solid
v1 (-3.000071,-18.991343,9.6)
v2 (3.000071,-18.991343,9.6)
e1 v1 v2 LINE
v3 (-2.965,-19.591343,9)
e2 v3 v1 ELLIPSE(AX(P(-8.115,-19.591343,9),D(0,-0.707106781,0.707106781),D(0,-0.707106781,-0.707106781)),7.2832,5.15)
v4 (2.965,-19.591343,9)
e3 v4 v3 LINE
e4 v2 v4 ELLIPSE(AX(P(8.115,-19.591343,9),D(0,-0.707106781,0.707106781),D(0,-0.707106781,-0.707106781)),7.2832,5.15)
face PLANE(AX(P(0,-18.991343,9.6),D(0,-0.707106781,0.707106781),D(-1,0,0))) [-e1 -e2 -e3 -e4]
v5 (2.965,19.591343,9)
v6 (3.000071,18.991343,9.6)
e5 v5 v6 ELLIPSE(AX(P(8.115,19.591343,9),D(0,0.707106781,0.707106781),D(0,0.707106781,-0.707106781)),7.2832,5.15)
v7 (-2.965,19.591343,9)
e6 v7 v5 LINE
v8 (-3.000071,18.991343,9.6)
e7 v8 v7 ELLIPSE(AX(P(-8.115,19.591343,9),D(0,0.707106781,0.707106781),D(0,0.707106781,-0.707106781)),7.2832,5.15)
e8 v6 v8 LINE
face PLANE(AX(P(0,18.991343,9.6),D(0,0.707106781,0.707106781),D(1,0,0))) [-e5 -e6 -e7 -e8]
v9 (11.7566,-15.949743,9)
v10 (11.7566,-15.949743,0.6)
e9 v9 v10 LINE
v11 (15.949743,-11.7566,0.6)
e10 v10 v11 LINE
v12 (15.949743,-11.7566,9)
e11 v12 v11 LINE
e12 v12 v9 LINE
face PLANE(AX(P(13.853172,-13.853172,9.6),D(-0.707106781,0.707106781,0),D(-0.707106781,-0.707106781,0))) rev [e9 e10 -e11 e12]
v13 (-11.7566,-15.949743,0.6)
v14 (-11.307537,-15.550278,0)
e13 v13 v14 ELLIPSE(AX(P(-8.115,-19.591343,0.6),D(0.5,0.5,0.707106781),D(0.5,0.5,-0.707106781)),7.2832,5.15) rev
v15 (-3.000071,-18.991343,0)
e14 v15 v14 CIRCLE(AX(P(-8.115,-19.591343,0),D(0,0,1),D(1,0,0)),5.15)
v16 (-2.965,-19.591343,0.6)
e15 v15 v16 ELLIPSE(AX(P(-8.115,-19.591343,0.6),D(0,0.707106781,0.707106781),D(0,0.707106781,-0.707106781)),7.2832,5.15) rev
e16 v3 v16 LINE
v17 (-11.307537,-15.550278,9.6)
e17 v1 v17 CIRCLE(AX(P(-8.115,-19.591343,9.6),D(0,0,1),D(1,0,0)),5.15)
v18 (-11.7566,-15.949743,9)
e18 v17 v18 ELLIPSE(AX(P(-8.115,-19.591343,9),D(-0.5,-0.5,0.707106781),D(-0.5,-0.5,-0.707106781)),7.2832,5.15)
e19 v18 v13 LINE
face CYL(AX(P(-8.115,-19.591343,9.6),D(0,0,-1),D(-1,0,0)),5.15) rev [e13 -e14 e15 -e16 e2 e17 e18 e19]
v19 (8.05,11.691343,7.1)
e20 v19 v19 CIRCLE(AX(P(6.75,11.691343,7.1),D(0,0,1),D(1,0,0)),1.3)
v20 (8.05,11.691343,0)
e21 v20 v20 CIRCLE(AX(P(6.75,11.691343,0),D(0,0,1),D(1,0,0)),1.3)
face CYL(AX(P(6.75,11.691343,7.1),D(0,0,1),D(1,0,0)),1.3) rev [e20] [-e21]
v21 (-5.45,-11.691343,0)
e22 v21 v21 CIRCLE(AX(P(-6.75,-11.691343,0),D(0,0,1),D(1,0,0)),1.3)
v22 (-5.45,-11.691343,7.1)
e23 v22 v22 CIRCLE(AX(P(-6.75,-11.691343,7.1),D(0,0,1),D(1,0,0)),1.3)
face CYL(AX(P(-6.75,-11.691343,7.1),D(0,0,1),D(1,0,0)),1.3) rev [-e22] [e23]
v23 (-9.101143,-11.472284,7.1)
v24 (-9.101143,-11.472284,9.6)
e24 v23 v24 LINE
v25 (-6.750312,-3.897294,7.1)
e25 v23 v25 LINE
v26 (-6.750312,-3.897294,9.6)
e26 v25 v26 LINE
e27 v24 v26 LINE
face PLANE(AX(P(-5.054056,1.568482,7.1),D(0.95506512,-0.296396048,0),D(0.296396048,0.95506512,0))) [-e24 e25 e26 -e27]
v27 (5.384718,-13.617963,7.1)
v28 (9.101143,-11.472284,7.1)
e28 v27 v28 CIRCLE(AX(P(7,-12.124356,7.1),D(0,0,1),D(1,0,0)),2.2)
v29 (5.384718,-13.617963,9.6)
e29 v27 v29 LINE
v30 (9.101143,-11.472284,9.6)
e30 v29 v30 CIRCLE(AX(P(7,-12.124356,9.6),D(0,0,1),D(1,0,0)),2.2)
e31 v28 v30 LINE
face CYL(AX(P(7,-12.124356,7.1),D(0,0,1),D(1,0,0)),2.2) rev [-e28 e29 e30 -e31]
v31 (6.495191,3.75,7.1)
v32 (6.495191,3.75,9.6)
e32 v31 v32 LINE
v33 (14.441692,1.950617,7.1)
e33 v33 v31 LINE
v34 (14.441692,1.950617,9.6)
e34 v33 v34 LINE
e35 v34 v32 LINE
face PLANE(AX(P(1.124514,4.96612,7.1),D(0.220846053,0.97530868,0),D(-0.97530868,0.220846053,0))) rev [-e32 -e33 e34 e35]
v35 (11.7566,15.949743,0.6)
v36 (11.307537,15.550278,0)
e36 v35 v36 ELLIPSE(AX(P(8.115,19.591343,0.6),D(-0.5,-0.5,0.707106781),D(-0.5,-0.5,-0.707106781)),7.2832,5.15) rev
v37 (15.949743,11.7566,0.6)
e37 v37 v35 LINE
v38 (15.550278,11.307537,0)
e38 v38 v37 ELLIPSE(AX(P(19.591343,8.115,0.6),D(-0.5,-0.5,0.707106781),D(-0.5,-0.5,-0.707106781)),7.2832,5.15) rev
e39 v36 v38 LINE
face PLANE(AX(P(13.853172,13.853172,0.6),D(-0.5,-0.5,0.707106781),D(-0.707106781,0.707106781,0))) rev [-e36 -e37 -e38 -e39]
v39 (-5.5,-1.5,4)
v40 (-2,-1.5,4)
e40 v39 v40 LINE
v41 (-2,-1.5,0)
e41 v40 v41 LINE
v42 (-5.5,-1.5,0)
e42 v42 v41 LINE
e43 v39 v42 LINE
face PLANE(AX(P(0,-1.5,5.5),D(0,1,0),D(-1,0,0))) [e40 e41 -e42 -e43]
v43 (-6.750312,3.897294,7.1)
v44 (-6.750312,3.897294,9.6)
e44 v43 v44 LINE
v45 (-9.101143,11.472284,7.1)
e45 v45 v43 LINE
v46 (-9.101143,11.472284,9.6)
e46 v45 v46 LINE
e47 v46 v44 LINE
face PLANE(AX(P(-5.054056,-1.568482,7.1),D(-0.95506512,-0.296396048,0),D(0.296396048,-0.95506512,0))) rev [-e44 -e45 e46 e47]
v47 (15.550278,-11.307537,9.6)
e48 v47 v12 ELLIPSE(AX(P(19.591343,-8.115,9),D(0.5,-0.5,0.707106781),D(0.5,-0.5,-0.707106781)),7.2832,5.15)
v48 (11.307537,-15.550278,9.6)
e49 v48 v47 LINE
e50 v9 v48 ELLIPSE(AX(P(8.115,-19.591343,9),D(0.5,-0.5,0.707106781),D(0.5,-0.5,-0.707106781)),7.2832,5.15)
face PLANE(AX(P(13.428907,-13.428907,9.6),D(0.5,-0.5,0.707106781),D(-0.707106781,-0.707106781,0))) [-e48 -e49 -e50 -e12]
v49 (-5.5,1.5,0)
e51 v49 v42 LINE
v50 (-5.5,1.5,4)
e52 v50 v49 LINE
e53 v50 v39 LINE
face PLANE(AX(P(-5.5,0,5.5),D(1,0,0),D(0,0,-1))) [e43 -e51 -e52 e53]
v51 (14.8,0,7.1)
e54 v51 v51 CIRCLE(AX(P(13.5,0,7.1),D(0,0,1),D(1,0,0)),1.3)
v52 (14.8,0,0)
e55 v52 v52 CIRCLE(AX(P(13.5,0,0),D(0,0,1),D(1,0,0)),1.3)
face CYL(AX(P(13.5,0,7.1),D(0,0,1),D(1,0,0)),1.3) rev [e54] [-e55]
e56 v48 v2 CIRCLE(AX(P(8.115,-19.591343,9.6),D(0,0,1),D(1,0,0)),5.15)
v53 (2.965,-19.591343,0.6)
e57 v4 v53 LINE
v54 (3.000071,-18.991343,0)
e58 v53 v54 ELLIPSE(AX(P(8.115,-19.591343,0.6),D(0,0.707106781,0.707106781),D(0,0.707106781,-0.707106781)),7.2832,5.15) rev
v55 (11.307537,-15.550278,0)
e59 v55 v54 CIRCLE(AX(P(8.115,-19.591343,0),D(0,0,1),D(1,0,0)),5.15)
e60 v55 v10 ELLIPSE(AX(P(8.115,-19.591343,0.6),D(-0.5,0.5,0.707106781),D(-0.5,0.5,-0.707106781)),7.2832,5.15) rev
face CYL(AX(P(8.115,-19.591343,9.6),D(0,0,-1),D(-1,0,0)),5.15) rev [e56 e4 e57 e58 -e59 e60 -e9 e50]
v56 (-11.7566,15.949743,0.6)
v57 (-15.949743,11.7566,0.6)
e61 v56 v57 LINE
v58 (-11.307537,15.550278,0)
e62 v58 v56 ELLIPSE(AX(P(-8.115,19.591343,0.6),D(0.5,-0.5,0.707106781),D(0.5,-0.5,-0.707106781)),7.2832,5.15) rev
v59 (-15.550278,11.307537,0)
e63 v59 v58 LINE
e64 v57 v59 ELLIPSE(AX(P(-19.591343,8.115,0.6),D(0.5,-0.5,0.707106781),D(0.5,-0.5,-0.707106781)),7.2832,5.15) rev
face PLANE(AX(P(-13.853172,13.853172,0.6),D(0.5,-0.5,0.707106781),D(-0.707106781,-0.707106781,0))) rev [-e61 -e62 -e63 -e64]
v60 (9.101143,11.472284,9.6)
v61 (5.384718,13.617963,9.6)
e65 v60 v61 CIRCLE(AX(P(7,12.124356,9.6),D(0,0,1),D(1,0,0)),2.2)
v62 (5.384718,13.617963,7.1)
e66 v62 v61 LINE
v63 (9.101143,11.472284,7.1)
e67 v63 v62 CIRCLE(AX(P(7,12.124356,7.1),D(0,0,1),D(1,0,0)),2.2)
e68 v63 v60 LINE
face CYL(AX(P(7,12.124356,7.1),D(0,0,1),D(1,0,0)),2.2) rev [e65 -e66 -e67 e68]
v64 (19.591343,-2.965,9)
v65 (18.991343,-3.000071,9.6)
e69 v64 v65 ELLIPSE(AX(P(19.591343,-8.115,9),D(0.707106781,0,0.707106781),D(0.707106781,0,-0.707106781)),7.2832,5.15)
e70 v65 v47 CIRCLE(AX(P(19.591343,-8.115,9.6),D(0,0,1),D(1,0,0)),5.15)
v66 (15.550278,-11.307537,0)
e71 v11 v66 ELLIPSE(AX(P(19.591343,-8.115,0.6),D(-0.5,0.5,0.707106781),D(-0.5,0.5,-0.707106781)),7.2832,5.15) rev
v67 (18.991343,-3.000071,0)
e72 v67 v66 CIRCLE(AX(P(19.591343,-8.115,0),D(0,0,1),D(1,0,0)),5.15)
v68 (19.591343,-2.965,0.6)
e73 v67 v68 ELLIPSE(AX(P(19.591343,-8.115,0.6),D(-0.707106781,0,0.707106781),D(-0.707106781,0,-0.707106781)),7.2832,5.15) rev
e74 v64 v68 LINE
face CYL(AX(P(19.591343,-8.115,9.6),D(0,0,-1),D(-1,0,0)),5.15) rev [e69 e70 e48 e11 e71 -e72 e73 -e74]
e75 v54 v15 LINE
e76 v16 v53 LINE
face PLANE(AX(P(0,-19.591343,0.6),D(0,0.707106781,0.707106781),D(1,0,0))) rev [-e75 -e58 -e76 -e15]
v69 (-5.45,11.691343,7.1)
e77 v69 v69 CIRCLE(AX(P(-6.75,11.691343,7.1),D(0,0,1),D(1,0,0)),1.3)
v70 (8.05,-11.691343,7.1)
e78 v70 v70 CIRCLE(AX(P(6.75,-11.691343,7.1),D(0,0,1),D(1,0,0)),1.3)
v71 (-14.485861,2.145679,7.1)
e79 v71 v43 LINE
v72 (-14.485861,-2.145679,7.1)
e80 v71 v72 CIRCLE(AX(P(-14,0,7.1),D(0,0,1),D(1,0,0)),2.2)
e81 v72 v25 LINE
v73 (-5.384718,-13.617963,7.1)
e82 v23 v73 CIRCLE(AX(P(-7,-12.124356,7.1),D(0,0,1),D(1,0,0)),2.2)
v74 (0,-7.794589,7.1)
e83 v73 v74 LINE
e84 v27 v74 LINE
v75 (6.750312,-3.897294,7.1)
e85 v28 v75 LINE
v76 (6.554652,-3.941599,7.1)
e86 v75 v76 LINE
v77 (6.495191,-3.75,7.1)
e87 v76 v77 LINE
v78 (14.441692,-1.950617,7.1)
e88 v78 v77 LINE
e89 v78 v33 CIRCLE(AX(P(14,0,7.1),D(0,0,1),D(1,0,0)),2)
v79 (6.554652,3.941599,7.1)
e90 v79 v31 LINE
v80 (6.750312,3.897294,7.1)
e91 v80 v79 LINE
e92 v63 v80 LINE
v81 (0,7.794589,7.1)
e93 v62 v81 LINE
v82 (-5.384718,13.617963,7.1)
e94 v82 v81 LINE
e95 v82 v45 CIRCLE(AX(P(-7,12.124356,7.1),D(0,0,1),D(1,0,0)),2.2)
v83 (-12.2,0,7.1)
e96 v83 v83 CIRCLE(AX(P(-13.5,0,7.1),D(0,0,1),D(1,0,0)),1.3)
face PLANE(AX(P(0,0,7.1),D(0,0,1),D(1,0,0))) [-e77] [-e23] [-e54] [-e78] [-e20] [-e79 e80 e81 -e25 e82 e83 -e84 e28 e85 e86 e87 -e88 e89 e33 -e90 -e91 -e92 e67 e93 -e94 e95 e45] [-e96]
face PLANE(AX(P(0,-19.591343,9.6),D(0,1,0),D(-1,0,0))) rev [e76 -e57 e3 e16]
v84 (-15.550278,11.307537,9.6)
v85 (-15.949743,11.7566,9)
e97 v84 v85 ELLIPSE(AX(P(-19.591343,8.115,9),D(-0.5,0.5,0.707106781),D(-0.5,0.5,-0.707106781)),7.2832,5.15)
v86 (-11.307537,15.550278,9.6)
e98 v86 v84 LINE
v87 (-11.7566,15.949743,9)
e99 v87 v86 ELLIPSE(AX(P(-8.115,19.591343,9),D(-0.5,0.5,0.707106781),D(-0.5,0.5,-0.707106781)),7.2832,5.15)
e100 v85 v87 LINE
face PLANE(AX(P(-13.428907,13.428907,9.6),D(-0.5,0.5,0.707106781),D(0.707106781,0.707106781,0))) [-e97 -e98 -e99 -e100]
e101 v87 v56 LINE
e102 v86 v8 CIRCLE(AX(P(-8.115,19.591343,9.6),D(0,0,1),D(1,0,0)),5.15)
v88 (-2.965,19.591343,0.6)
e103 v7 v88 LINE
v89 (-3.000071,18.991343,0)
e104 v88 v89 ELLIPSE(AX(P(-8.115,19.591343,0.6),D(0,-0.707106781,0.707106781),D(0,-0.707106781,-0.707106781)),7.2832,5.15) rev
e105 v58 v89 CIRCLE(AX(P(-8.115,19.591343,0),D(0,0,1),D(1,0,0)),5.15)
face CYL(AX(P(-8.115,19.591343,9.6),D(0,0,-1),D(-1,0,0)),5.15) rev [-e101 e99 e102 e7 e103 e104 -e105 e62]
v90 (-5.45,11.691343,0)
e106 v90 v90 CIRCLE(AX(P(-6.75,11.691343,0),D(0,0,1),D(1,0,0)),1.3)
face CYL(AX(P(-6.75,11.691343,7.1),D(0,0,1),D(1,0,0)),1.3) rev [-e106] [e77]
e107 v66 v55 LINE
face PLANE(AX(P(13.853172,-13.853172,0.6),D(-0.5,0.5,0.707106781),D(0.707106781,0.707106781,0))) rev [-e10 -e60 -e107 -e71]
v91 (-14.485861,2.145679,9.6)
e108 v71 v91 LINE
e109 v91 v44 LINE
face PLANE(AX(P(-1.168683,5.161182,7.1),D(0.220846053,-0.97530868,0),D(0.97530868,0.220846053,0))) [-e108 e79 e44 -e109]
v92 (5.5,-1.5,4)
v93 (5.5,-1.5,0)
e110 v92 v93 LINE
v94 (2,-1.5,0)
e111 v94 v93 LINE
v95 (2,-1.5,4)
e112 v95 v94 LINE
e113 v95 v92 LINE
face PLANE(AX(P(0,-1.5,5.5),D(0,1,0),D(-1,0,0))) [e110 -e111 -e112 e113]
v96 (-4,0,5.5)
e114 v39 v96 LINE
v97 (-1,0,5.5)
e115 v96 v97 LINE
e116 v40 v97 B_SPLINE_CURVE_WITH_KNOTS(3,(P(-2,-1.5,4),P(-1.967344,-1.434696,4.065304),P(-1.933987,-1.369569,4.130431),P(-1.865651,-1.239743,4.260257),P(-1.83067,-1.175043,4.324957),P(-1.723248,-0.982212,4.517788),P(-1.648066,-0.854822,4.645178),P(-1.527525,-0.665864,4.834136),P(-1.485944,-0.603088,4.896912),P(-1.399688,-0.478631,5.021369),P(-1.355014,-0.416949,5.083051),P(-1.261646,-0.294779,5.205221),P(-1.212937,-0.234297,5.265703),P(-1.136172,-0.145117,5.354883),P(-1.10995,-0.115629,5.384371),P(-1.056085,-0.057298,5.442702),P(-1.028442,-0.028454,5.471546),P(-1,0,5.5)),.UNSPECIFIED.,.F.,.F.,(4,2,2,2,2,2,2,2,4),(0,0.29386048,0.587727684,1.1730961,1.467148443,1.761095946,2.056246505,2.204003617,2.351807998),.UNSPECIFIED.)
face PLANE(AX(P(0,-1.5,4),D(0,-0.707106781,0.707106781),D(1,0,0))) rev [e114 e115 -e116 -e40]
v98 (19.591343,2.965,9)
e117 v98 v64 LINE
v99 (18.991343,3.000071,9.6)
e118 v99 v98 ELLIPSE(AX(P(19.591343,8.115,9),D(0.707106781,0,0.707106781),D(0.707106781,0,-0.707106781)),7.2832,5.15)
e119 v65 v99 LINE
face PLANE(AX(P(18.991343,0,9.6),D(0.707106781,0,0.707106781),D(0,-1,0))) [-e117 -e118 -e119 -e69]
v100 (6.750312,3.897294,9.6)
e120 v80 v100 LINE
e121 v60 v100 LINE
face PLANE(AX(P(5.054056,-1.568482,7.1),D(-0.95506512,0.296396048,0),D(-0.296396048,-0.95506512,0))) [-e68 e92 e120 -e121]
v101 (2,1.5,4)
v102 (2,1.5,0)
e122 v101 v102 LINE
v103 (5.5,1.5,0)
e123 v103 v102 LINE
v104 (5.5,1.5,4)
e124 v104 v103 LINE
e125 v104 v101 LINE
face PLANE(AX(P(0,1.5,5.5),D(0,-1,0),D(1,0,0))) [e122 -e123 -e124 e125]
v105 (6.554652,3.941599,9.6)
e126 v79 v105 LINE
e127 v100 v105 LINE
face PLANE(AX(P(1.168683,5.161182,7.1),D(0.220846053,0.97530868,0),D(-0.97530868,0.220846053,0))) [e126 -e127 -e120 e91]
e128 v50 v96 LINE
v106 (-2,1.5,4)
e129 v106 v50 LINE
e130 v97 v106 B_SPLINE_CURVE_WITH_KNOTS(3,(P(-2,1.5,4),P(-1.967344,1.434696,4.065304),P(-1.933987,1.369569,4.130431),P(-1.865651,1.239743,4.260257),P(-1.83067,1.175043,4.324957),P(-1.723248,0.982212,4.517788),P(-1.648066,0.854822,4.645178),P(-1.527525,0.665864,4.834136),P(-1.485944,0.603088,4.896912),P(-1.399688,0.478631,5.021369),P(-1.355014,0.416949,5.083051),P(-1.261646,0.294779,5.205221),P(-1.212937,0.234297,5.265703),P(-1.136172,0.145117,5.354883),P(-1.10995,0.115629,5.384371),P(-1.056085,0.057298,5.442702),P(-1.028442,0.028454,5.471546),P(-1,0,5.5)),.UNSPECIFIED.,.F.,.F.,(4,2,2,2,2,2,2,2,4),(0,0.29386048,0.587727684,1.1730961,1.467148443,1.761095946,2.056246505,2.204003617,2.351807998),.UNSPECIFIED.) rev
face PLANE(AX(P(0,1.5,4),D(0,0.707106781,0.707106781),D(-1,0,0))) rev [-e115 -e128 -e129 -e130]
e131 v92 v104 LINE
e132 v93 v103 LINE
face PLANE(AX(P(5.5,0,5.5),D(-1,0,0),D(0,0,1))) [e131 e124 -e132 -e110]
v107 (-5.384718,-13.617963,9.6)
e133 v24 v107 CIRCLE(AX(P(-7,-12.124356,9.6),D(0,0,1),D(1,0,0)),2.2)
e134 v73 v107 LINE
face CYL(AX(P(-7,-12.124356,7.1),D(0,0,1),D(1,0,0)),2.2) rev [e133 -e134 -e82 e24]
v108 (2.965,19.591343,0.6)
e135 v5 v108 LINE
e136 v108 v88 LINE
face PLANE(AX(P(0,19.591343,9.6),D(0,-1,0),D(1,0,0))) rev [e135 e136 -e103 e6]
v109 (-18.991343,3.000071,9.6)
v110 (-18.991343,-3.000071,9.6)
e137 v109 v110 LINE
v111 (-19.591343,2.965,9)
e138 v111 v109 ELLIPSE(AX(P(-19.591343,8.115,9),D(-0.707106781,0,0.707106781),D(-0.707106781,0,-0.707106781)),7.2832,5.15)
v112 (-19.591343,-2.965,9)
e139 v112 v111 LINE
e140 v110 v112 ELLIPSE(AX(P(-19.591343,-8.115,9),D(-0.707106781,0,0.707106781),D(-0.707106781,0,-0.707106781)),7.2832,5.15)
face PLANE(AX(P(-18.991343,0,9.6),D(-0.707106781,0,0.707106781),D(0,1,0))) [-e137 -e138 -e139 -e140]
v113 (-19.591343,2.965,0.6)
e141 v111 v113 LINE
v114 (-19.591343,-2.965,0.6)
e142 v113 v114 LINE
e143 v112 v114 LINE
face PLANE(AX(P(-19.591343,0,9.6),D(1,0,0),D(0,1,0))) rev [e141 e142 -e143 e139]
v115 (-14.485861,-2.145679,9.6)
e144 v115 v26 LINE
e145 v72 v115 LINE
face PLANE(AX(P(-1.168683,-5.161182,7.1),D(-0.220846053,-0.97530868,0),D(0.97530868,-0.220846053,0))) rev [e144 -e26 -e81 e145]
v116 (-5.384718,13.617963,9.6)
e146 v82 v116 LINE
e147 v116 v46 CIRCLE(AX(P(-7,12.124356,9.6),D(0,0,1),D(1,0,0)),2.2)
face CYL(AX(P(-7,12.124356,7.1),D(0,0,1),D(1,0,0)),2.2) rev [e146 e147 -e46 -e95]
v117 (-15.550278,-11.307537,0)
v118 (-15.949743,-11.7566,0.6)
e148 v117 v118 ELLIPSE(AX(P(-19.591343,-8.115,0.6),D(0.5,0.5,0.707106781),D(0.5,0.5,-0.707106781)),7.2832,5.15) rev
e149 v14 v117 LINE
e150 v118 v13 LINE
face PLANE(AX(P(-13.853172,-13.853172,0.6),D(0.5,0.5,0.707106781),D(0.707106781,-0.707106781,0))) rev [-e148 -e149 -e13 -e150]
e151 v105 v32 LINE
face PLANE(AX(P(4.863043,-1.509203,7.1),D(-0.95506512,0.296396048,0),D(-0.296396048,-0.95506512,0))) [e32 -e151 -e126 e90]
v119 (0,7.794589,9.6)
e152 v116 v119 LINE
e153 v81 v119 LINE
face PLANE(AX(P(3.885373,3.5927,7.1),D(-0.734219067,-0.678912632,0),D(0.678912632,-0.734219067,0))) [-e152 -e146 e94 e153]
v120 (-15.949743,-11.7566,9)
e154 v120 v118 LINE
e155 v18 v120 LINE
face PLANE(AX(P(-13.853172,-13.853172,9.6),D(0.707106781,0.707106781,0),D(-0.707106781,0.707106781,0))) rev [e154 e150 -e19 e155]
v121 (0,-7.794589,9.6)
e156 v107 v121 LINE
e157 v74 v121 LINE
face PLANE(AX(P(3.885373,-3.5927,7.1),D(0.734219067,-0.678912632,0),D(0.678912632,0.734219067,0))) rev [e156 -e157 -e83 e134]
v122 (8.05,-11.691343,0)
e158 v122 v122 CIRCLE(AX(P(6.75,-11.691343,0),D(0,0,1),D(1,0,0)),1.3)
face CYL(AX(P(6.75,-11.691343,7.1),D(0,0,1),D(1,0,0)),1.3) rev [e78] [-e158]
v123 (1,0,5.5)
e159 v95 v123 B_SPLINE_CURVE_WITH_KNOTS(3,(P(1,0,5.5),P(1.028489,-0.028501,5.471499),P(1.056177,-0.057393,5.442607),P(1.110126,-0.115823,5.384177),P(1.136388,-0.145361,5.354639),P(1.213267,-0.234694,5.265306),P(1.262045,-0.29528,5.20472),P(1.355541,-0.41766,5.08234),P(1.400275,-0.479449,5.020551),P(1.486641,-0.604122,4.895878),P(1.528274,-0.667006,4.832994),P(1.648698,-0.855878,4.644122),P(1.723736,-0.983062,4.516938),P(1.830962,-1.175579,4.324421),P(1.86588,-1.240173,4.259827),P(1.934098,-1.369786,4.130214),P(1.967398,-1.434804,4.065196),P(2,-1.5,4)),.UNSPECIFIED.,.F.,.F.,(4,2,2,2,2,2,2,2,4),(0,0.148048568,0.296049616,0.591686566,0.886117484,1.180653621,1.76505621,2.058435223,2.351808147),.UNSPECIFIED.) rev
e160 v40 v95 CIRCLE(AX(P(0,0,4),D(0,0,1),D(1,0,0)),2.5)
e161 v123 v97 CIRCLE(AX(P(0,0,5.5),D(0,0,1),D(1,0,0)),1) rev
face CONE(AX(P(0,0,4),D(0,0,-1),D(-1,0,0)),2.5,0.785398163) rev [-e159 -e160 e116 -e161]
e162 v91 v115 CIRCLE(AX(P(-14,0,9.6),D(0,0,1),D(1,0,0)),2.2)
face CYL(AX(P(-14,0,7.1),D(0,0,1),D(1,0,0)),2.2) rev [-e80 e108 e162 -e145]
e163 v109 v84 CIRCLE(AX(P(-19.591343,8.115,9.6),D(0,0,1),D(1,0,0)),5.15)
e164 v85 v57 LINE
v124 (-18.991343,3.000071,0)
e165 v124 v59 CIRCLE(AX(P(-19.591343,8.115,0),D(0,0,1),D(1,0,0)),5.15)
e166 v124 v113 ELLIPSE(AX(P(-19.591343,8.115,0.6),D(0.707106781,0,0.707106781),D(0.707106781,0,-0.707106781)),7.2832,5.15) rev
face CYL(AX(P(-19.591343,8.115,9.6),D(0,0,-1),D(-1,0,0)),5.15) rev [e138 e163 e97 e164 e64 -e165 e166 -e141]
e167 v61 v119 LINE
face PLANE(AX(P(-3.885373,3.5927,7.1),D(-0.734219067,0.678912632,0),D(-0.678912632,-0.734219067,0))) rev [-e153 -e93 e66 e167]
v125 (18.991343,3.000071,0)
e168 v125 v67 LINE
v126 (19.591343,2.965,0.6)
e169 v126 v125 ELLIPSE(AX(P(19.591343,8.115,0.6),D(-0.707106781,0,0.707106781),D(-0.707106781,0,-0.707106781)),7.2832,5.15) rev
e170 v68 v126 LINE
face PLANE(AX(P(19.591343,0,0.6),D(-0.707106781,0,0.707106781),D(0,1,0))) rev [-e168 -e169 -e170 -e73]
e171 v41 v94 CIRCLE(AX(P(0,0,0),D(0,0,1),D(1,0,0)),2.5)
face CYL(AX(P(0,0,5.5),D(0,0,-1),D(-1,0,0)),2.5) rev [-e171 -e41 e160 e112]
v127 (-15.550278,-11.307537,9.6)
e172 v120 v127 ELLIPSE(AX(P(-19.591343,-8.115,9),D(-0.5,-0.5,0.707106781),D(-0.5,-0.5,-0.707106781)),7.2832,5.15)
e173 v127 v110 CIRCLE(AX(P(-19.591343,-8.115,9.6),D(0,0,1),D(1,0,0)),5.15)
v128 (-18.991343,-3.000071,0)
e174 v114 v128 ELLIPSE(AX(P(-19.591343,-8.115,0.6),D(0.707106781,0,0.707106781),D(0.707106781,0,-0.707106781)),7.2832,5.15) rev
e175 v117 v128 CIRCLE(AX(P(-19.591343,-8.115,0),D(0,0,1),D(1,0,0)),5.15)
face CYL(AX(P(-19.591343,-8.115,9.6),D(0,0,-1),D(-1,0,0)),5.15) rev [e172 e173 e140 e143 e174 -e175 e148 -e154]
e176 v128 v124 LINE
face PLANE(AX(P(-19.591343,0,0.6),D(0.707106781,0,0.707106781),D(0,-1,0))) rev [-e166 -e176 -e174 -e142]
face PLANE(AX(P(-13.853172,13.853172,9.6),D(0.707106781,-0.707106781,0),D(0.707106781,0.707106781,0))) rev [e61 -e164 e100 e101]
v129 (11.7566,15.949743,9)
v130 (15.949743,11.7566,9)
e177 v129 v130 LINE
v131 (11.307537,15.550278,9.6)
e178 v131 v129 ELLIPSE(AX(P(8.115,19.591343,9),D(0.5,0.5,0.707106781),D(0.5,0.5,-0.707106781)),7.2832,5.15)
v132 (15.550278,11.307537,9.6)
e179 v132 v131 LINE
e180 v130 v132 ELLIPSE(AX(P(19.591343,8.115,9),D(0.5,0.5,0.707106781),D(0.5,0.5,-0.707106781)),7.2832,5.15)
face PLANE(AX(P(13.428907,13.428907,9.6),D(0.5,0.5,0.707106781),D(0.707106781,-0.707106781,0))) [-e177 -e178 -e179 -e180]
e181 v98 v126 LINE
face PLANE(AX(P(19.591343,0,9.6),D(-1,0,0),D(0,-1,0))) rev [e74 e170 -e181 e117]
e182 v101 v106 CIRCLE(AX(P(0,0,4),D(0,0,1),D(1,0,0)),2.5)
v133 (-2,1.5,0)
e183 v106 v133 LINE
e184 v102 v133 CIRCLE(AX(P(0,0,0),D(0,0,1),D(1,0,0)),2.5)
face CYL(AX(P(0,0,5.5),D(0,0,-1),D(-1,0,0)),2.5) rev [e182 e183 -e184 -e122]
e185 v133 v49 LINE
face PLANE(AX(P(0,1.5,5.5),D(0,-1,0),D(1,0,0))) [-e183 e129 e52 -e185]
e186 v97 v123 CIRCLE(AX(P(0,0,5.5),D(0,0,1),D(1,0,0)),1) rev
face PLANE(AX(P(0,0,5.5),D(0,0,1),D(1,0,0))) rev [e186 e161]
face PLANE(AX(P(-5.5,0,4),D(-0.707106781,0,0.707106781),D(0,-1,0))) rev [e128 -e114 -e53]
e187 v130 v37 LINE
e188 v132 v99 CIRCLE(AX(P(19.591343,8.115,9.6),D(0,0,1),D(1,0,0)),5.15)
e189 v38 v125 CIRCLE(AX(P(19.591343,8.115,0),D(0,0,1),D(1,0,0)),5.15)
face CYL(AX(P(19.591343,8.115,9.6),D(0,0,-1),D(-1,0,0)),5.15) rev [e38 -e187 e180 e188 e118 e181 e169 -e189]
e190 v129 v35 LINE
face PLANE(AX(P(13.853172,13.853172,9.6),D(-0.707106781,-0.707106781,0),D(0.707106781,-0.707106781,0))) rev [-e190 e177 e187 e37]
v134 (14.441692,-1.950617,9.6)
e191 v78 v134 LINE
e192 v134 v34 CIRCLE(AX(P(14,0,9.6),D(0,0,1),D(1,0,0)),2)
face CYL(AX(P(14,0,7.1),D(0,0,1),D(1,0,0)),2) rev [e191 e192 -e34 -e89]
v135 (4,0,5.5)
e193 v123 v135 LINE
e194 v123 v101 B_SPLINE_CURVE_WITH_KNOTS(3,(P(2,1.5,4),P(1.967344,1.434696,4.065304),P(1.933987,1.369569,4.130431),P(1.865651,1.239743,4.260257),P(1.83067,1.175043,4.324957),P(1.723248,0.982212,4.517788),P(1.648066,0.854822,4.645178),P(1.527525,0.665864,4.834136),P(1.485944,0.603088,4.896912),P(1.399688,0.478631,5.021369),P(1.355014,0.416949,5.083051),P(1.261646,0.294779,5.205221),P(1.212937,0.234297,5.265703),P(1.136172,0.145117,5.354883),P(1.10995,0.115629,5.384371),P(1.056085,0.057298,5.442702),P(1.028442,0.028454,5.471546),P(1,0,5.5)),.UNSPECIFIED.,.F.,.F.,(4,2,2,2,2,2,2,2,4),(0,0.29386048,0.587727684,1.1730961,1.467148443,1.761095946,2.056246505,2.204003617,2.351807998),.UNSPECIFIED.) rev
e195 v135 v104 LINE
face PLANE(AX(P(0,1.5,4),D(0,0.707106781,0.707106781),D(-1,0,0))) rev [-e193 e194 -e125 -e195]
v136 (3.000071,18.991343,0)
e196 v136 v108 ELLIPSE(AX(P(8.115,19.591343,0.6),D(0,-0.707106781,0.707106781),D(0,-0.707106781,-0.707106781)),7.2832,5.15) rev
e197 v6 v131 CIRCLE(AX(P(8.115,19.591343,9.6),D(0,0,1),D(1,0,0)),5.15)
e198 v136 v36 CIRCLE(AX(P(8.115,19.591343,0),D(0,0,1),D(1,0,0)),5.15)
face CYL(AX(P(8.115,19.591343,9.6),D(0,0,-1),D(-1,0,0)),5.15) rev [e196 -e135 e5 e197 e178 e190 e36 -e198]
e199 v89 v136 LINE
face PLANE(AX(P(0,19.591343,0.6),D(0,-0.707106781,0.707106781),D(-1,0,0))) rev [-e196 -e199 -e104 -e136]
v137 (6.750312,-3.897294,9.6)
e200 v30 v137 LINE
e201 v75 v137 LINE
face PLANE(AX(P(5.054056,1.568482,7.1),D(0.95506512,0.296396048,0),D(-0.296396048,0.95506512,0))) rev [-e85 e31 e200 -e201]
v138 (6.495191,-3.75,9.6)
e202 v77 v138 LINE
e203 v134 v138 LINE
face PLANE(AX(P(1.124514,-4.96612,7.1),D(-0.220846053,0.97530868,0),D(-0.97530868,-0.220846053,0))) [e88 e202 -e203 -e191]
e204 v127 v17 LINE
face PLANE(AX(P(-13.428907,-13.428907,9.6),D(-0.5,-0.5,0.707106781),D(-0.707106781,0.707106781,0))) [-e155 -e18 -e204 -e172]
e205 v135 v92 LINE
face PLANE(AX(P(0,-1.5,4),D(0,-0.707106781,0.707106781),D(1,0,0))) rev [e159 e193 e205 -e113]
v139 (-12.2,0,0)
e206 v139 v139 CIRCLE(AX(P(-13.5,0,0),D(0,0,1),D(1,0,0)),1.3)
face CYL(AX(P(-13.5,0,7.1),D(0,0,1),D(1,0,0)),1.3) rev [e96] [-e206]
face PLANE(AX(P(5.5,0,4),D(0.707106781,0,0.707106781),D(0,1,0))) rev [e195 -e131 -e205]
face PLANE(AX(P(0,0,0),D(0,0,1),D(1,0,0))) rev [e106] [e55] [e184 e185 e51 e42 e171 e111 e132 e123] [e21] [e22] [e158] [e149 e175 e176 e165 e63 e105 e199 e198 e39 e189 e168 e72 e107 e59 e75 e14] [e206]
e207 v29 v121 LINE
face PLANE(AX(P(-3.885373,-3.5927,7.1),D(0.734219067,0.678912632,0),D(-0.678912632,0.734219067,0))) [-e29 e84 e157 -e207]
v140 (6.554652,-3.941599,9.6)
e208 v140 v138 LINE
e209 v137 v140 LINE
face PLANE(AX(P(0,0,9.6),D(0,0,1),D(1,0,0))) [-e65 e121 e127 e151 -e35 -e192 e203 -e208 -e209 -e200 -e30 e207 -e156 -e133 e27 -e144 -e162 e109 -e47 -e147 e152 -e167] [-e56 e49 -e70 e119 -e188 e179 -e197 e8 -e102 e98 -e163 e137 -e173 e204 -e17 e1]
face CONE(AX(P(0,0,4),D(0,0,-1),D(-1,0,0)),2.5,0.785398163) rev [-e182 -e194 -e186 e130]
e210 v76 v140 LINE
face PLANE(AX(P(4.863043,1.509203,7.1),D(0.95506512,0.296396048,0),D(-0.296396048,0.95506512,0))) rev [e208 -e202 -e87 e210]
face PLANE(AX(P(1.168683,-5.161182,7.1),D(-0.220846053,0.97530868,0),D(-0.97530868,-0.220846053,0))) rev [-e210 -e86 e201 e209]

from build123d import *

# Parameters (mm, degrees)
BOSS_EXTRUDE1_DEPTH  = 9.6
CHAMFER2_SIZE        = 0.6
CUT_EXTRUDE2_DEPTH   = 2.5
M2_CLEARANCE_HOLE1_D = 2.6
CUT_EXTRUDE3_START   = -9.6
CUT_EXTRUDE3_DEPTH   = 5.5
CHAMFER3_SIZE        = 1.5


with BuildPart() as part:
    # Sketch1 → Boss-Extrude1 (new body)
    with BuildSketch(Plane.XY):
        with BuildLine():
            ThreePointArc((-11.756599923, -15.949743136), (-6.144180323, -14.833363466), (-2.965, -19.591343059))
            Line((-2.965, -19.591343059), (2.965, -19.591343059))
            ThreePointArc((2.965, -19.591343059), (6.144180323, -14.833363466), (11.756599923, -15.949743136))
            Line((11.756599923, -15.949743136), (15.949743136, -11.756599923))
            ThreePointArc((15.949743136, -11.756599923), (14.833363466, -6.144180323), (19.591343059, -2.965))
            Line((19.591343059, -2.965), (19.591343059, 2.965))
            ThreePointArc((19.591343059, 2.965), (14.833363466, 6.144180323), (15.949743136, 11.756599923))
            Line((15.949743136, 11.756599923), (11.756599923, 15.949743136))
            ThreePointArc((11.756599923, 15.949743136), (6.144180323, 14.833363466), (2.965, 19.591343059))
            Line((2.965, 19.591343059), (-2.965, 19.591343059))
            ThreePointArc((-2.965, 19.591343059), (-6.144180323, 14.833363466), (-11.756599923, 15.949743136))
            Line((-11.756599923, 15.949743136), (-15.949743136, 11.756599923))
            ThreePointArc((-15.949743136, 11.756599923), (-14.833363466, 6.144180323), (-19.591343059, 2.965))
            Line((-19.591343059, 2.965), (-19.591343059, -2.965))
            ThreePointArc((-19.591343059, -2.965), (-14.833363466, -6.144180323), (-15.949743136, -11.756599923))
            Line((-15.949743136, -11.756599923), (-11.756599923, -15.949743136))
        make_face()
    extrude(amount=BOSS_EXTRUDE1_DEPTH)

    # Chamfer2
    chamfer2_edges = [part.edges().sort_by_distance(p)[0] for p in [
        (-19.591343059, 0, 9.6),
        (-13.853171529, 13.853171529, 0),
        (0, 19.591343059, 0),
        (13.853171529, 13.853171529, 0),
        (19.591343059, 0, 0),
        (-13.853171529, -13.853171529, 9.6),
        (13.853171529, -13.853171529, 0),
        (0, -19.591343059, 0),
        (-13.853171529, -13.853171529, 0),
        (-19.591343059, 0, 0),
        (0, -19.591343059, 9.6),
        (13.853171529, -13.853171529, 9.6),
        (19.591343059, 0, 9.6),
        (13.853171529, 13.853171529, 9.6),
        (0, 19.591343059, 9.6),
        (-13.853171529, 13.853171529, 9.6),
    ]]
    chamfer(chamfer2_edges, length=CHAMFER2_SIZE)

    # Sketch4 → Cut-Extrude2 (cut)
    with BuildSketch(Plane.XY.offset(9.6)):
        with BuildLine():
            ThreePointArc((14.441692106, -1.95061736), (16, 0), (14.441692106, 1.95061736))
            Line((14.441692106, 1.95061736), (6.69085075, 3.70569527))
            Line((6.69085075, 3.70569527), (6.495190528, 3.75))
            Line((6.495190528, 3.75), (6.554651618, 3.941599088))
            Line((6.554651618, 3.941599088), (6.750311839, 3.897294358))
            Line((6.750311839, 3.897294358), (9.101143263, 11.472284348))
            ThreePointArc((9.101143263, 11.472284348), (8.1, 14.029611541), (5.384718053, 13.617963443))
            Line((5.384718053, 13.617963443), (0, 7.794588715))
            Line((0, 7.794588715), (-5.384718053, 13.617963443))
            ThreePointArc((-5.384718053, 13.617963443), (-8.1, 14.029611541), (-9.101143263, 11.472284348))
            Line((-9.101143263, 11.472284348), (-6.750311839, 3.897294358))
            Line((-6.750311839, 3.897294358), (-14.485861316, 2.145679096))
            ThreePointArc((-14.485861316, 2.145679096), (-16.2, 0), (-14.485861316, -2.145679096))
            Line((-14.485861316, -2.145679096), (-6.750311839, -3.897294358))
            Line((-6.750311839, -3.897294358), (-9.101143263, -11.472284348))
            ThreePointArc((-9.101143263, -11.472284348), (-8.1, -14.029611541), (-5.384718053, -13.617963443))
            Line((-5.384718053, -13.617963443), (0, -7.794588715))
            Line((0, -7.794588715), (5.384718053, -13.617963443))
            ThreePointArc((5.384718053, -13.617963443), (8.1, -14.029611541), (9.101143263, -11.472284348))
            Line((9.101143263, -11.472284348), (6.750311839, -3.897294358))
            Line((6.750311839, -3.897294358), (6.554651618, -3.941599088))
            Line((6.554651618, -3.941599088), (6.495190528, -3.75))
            Line((6.495190528, -3.75), (6.69085075, -3.70569527))
            Line((6.69085075, -3.70569527), (14.441692106, -1.95061736))
        make_face()
    extrude(amount=-CUT_EXTRUDE2_DEPTH, mode=Mode.SUBTRACT)

    # M2 Clearance Hole1 (through all)
    with Locations(Plane.XY.offset(7.1)):
        with Locations((13.5, 0), (6.75, -11.691342951), (-6.75, -11.691342951), (-13.5, 0), (-6.75, 11.691342951), (6.75, 11.691342951)):
            Hole(M2_CLEARANCE_HOLE1_D / 2)

    # Sketch3<2> → Cut-Extrude3 (cut)
    with BuildSketch(Plane.XY.offset(9.6).offset(CUT_EXTRUDE3_START)):
        with BuildLine():
            Line((-2, -1.5), (-5.5, -1.5))
            Line((-5.5, -1.5), (-5.5, 1.5))
            Line((-5.5, 1.5), (-2, 1.5))
            ThreePointArc((-2, 1.5), (0, 2.5), (2, 1.5))
            Line((2, 1.5), (5.5, 1.5))
            Line((5.5, 1.5), (5.5, -1.5))
            Line((5.5, -1.5), (2, -1.5))
            ThreePointArc((2, -1.5), (0, -2.5), (-2, -1.5))
        make_face()
    extrude(amount=CUT_EXTRUDE3_DEPTH, mode=Mode.SUBTRACT)

    # Chamfer3
    chamfer3_edges = [part.edges().sort_by_distance(p)[0] for p in [
        (-3.75, -1.5, 5.5),
        (0, -2.5, 5.5),
        (3.75, -1.5, 5.5),
        (5.5, 0, 5.5),
        (3.75, 1.5, 5.5),
        (0, 2.5, 5.5),
        (-3.75, 1.5, 5.5),
        (-5.5, 0, 5.5),
    ]]
    chamfer(chamfer3_edges, length=CHAMFER3_SIZE - 0.0001)  # a hair under: the kernel refuses the full size


solid = part.part
